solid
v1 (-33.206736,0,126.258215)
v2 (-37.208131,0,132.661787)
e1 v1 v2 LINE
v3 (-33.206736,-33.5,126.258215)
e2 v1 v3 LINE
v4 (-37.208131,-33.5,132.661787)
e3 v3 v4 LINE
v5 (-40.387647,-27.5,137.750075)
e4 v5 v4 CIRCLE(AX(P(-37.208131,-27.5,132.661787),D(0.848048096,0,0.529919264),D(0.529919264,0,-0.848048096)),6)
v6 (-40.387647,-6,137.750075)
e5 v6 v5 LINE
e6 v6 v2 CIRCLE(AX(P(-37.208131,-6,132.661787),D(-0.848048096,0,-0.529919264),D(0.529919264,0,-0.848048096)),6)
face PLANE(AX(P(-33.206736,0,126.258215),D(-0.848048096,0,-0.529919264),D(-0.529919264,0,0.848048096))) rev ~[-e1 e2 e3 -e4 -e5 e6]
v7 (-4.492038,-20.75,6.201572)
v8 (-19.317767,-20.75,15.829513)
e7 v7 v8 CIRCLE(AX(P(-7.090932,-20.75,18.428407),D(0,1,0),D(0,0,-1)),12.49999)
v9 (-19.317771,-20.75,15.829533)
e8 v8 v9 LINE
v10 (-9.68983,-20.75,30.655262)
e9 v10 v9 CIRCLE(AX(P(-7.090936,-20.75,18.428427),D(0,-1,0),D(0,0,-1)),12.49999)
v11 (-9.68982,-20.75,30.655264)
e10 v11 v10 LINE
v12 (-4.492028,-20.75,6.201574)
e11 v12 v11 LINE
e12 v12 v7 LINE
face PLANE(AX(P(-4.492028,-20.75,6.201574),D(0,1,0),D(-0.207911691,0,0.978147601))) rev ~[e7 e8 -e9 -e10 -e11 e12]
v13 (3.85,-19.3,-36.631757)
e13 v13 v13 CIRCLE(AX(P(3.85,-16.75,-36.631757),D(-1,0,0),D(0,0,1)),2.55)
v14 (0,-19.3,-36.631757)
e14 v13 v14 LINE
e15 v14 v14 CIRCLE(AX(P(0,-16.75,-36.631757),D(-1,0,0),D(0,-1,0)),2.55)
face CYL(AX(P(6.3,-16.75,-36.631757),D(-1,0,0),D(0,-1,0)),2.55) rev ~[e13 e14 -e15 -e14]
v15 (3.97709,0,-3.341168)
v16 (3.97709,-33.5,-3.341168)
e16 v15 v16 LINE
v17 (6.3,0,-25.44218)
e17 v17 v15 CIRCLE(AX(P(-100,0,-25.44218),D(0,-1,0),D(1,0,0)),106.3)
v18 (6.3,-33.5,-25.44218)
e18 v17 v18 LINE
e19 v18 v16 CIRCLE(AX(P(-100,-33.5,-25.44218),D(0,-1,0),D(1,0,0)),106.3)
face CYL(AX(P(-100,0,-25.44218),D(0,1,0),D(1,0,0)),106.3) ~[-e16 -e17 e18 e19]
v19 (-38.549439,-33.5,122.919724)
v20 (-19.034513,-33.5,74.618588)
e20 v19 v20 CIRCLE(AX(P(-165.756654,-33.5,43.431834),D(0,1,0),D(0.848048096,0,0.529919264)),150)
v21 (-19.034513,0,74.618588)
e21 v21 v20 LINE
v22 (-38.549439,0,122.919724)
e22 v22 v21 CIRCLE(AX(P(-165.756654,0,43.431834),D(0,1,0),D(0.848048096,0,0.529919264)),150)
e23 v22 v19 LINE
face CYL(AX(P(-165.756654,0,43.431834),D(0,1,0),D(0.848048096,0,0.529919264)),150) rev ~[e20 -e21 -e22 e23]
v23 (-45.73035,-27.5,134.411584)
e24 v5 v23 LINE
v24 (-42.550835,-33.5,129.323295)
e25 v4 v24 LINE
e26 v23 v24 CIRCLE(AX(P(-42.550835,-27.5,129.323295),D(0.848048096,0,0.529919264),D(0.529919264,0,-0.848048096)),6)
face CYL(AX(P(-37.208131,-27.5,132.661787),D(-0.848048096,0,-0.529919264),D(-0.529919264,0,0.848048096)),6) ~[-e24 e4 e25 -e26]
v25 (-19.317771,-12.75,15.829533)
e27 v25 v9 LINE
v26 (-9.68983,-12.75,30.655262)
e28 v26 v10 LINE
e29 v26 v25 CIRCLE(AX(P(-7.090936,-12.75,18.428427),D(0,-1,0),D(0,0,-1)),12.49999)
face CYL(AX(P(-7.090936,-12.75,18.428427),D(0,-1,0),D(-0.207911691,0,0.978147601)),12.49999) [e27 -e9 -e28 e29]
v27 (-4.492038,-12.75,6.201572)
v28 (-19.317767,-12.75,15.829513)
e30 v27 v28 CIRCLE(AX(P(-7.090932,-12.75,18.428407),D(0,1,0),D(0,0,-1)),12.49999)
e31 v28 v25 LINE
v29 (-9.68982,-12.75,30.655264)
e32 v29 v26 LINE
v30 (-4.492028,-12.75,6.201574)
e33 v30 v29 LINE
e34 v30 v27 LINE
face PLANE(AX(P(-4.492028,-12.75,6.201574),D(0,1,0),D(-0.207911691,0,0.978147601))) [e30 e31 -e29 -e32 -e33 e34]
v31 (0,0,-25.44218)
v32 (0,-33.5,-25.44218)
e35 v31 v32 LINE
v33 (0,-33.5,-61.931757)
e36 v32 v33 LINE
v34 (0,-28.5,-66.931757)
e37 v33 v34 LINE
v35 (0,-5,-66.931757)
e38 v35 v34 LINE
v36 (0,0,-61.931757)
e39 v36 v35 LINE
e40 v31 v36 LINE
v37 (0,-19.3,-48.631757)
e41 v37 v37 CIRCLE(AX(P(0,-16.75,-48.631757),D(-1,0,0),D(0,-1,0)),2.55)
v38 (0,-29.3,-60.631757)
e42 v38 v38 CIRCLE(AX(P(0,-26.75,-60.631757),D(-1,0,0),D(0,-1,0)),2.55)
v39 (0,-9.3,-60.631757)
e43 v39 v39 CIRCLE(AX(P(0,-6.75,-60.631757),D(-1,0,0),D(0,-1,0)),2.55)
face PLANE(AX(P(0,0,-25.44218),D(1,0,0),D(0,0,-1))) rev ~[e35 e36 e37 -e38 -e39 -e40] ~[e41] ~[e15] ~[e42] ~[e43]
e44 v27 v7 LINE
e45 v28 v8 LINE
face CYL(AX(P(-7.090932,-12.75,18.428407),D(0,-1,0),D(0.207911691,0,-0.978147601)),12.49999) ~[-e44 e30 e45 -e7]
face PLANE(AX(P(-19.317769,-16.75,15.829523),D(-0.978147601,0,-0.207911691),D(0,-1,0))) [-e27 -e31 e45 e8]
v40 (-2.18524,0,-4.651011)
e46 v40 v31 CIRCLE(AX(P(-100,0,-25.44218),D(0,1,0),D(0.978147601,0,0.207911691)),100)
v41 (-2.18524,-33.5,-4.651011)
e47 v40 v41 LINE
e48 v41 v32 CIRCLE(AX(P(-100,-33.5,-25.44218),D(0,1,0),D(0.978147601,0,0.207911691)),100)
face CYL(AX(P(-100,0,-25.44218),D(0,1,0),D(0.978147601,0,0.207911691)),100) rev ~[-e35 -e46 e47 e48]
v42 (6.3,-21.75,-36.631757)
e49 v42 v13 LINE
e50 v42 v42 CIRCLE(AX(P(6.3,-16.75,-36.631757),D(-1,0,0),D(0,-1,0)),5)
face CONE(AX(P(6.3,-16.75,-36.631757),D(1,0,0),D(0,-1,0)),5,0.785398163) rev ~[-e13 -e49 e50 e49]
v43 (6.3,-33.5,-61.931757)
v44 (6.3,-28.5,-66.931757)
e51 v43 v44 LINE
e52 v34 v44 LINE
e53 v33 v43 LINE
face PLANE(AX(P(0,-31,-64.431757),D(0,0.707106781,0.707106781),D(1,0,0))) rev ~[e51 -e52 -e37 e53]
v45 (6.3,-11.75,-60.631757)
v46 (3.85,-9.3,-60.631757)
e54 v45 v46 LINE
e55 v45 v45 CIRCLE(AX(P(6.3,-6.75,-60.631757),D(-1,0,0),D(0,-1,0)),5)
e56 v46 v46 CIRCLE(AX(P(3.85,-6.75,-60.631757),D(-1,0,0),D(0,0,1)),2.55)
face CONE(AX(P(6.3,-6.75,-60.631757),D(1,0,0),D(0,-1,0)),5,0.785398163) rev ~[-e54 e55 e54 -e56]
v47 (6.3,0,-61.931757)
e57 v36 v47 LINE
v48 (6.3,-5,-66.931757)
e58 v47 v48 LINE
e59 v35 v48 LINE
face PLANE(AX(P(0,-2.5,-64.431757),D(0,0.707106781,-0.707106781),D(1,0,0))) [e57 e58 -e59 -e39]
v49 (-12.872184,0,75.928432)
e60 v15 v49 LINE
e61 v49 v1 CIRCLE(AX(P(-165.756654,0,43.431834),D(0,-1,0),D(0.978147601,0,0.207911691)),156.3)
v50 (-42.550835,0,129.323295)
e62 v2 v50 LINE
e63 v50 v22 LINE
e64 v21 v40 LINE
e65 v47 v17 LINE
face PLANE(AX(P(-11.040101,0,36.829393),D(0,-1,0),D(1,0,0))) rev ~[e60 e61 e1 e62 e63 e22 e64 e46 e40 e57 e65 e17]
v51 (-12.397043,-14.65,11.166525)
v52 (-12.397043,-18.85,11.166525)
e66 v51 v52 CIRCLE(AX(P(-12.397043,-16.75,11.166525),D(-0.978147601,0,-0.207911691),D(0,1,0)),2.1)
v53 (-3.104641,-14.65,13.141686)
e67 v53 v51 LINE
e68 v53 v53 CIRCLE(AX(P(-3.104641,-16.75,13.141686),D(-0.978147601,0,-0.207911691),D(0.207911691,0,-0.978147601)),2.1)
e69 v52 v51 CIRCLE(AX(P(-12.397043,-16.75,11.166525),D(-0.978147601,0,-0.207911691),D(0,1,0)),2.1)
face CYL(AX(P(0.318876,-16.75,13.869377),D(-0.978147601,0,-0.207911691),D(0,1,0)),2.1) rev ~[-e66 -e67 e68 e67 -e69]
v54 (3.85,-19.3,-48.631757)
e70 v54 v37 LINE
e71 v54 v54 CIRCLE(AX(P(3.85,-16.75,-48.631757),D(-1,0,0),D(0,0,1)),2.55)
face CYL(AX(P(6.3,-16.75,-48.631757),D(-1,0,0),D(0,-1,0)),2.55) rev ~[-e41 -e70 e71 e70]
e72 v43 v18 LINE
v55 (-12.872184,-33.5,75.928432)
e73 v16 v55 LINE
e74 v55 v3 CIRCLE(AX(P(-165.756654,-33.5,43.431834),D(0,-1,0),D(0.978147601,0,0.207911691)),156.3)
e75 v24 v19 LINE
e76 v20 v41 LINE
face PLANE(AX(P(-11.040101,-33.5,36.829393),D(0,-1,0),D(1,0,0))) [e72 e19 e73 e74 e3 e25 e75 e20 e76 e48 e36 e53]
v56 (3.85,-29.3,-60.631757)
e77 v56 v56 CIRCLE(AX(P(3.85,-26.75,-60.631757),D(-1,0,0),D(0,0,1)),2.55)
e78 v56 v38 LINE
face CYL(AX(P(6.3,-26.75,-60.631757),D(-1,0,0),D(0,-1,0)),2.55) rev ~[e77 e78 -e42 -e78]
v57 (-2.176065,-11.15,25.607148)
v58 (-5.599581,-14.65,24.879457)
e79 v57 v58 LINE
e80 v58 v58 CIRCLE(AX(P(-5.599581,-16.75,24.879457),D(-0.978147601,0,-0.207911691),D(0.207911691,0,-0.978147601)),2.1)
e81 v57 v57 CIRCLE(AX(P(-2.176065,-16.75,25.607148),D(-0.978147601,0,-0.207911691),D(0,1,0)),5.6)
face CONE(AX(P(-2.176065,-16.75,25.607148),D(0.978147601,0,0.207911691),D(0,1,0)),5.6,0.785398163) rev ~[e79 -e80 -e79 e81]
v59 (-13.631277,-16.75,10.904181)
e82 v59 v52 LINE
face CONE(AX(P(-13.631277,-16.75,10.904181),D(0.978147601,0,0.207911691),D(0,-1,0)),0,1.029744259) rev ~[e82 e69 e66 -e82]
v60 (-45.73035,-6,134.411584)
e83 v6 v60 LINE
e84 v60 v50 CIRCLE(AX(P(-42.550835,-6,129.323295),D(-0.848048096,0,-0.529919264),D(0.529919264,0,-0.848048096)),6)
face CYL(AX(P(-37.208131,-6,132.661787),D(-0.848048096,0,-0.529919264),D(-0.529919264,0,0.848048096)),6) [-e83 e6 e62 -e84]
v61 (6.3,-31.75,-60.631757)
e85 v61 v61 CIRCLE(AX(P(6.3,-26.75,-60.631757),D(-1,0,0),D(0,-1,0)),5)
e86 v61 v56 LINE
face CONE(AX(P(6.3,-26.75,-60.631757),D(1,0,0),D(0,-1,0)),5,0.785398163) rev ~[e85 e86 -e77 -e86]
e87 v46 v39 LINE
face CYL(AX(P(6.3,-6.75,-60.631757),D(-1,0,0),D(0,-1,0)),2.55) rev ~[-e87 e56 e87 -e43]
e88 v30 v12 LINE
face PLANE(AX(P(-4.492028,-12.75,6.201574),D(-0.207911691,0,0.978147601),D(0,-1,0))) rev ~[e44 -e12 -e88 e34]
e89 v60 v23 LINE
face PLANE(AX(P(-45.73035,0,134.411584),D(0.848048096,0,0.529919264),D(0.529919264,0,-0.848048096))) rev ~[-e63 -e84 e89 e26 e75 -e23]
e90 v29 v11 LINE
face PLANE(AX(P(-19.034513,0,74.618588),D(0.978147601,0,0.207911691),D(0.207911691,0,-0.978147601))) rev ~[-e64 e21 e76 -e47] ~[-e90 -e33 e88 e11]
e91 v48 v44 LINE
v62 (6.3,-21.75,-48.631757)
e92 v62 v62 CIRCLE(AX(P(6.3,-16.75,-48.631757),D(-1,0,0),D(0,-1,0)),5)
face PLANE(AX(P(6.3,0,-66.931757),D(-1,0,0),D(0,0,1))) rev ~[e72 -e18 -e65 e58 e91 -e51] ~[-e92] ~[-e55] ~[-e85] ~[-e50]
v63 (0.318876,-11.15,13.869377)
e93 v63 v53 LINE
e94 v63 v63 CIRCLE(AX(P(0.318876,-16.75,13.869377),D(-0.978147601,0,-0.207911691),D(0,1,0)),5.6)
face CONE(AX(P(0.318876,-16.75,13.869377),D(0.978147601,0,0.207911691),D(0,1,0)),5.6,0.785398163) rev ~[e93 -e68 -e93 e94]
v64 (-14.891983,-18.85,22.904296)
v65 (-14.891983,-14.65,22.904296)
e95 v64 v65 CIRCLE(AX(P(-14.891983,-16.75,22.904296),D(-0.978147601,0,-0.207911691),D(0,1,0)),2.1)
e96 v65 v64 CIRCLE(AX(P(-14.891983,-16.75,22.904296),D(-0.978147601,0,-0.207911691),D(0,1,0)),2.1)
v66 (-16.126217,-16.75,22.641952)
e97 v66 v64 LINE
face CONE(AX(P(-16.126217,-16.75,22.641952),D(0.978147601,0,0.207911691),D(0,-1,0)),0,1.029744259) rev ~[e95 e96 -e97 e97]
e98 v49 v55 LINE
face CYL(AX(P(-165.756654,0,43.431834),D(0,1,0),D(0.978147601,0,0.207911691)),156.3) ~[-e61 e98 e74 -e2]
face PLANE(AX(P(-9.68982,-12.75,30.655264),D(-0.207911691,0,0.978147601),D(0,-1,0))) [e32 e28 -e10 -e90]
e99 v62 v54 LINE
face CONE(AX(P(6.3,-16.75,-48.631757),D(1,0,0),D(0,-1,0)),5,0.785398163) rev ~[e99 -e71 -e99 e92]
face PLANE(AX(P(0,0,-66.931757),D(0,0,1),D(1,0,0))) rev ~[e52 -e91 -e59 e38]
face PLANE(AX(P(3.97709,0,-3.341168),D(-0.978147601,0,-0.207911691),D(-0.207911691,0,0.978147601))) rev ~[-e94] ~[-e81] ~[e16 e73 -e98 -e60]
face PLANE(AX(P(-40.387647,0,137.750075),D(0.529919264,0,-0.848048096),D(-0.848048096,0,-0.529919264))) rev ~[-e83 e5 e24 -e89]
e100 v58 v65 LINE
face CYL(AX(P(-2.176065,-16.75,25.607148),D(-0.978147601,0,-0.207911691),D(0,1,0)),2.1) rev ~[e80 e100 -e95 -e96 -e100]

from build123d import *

# Parameters (mm, degrees)
F1_DEPTH        = 33.5
F2_R            = 6
F5_SIZE         = 5
F6_D            = 5.1
F6_CSINK_D      = 10
F6_CSINK_ANGLE  = 90
F7_W            = 8
F7_H            = 25
F8_DEPTH        = 12.5
F9_R            = 12.49999
F12_D           = 4.2
F12_DEPTH       = 13
F12_CSINK_D     = 11.2
F12_CSINK_ANGLE = 90
F12_TIP         = 1.2618073


# Not quite as in the source:
# - a fillet or chamfer is up to 0.001 mm smaller than in the source, because OpenCascade refuses the exact size


with BuildPart() as f1:
    # F0 (on Front) → F1 (new body)
    with BuildSketch(Plane.XZ):
        with BuildLine():
            Line((0, -25.4421804936), (0, -66.931756967))
            Line((0, -66.931756967), (6.3, -66.931756967))
            Line((6.3, -66.931756967), (6.3, -25.4421804936))
            ThreePointArc((6.3, -25.4421804936), (5.7176774776, -14.3308048482), (3.977089958, -3.3411677597))
            Line((3.977089958, -3.3411677597), (-12.8721835275, 75.928431603))
            ThreePointArc((-12.8721835275, 75.928431603), (-20.8378170534, 101.9828448791), (-33.2067360929, 126.2582153279))
            Line((-33.2067360929, 126.2582153279), (-40.38764708, 137.7500751305))
            Line((-40.38764708, 137.7500751305), (-45.7303500858, 134.4115837658))
            Line((-45.7303500858, 134.4115837658), (-38.5494390987, 122.9197239632))
            ThreePointArc((-38.5494390987, 122.9197239632), (-26.6790753372, 99.6228233406), (-19.0345134121, 74.6185879509))
            Line((-19.0345134121, 74.6185879509), (-2.1852399266, -4.6510114118))
            ThreePointArc((-2.1852399266, -4.6510114118), (-0.5478104632, -14.9893341668), (0, -25.4421804936))
        make_face()
    extrude(amount=F1_DEPTH)

    # F2
    f2_edges = [f1.edges().sort_by_distance(p)[0] for p in [
        (-43.058999, -33.5, 136.080829),
        (-43.058999, 0, 136.080829),
    ]]
    fillet(f2_edges, radius=F2_R)

    # F5
    f5_edges = [f1.edges().sort_by_distance(p)[0] for p in [
        (3.15, -33.5, -66.931757),
        (3.15, 0, -66.931757),
    ]]
    chamfer(f5_edges, length=F5_SIZE)

    # F6 (through all)
    with Locations(Plane.YZ.offset(6.3)):
        with Locations((-16.75, -36.631756967), (-16.75, -48.631756967), (-26.75, -60.631756967), (-6.75, -60.631756967)):
            CounterSinkHole(F6_D / 2, F6_CSINK_D / 2, counter_sink_angle=F6_CSINK_ANGLE)

    # F7 (on face) → F8 (join)
    with BuildSketch(Plane(origin=(-3.036646352, 0, -0.6454591076), x_dir=(0, -1, 0), z_dir=(-0.9781476007, 0, -0.2079116908))):
        with Locations((16.75, 19.5)):
            Rectangle(F7_W, F7_H)
    extrude(amount=F8_DEPTH)

    # F9 (radius 12.5 in the source; OpenCascade refuses exactly that, so slightly less here)
    f9_edges = [f1.edges().sort_by_distance(p)[0] for p in [
        (-16.718873, -16.75, 3.602678),
        (-21.916665, -16.75, 28.056368),
    ]]
    fillet(f9_edges, radius=F9_R)

    # F12
    with Locations(Plane(origin=(3.1256835326, 0, 0.6643845446), x_dir=(0, -1, 0), z_dir=(0.9781476007, 0, 0.2079116908))):
        with Locations((16.75, -25.5), (16.75, -13.5)):
            CounterSinkHole(F12_D / 2, F12_CSINK_D / 2, depth=F12_DEPTH, counter_sink_angle=F12_CSINK_ANGLE)
            with Locations((0, 0, -(F12_DEPTH + F12_TIP / 2))):  # 118° drill point
                Cone(0, F12_D / 2, F12_TIP, mode=Mode.SUBTRACT)


solid = f1.part
